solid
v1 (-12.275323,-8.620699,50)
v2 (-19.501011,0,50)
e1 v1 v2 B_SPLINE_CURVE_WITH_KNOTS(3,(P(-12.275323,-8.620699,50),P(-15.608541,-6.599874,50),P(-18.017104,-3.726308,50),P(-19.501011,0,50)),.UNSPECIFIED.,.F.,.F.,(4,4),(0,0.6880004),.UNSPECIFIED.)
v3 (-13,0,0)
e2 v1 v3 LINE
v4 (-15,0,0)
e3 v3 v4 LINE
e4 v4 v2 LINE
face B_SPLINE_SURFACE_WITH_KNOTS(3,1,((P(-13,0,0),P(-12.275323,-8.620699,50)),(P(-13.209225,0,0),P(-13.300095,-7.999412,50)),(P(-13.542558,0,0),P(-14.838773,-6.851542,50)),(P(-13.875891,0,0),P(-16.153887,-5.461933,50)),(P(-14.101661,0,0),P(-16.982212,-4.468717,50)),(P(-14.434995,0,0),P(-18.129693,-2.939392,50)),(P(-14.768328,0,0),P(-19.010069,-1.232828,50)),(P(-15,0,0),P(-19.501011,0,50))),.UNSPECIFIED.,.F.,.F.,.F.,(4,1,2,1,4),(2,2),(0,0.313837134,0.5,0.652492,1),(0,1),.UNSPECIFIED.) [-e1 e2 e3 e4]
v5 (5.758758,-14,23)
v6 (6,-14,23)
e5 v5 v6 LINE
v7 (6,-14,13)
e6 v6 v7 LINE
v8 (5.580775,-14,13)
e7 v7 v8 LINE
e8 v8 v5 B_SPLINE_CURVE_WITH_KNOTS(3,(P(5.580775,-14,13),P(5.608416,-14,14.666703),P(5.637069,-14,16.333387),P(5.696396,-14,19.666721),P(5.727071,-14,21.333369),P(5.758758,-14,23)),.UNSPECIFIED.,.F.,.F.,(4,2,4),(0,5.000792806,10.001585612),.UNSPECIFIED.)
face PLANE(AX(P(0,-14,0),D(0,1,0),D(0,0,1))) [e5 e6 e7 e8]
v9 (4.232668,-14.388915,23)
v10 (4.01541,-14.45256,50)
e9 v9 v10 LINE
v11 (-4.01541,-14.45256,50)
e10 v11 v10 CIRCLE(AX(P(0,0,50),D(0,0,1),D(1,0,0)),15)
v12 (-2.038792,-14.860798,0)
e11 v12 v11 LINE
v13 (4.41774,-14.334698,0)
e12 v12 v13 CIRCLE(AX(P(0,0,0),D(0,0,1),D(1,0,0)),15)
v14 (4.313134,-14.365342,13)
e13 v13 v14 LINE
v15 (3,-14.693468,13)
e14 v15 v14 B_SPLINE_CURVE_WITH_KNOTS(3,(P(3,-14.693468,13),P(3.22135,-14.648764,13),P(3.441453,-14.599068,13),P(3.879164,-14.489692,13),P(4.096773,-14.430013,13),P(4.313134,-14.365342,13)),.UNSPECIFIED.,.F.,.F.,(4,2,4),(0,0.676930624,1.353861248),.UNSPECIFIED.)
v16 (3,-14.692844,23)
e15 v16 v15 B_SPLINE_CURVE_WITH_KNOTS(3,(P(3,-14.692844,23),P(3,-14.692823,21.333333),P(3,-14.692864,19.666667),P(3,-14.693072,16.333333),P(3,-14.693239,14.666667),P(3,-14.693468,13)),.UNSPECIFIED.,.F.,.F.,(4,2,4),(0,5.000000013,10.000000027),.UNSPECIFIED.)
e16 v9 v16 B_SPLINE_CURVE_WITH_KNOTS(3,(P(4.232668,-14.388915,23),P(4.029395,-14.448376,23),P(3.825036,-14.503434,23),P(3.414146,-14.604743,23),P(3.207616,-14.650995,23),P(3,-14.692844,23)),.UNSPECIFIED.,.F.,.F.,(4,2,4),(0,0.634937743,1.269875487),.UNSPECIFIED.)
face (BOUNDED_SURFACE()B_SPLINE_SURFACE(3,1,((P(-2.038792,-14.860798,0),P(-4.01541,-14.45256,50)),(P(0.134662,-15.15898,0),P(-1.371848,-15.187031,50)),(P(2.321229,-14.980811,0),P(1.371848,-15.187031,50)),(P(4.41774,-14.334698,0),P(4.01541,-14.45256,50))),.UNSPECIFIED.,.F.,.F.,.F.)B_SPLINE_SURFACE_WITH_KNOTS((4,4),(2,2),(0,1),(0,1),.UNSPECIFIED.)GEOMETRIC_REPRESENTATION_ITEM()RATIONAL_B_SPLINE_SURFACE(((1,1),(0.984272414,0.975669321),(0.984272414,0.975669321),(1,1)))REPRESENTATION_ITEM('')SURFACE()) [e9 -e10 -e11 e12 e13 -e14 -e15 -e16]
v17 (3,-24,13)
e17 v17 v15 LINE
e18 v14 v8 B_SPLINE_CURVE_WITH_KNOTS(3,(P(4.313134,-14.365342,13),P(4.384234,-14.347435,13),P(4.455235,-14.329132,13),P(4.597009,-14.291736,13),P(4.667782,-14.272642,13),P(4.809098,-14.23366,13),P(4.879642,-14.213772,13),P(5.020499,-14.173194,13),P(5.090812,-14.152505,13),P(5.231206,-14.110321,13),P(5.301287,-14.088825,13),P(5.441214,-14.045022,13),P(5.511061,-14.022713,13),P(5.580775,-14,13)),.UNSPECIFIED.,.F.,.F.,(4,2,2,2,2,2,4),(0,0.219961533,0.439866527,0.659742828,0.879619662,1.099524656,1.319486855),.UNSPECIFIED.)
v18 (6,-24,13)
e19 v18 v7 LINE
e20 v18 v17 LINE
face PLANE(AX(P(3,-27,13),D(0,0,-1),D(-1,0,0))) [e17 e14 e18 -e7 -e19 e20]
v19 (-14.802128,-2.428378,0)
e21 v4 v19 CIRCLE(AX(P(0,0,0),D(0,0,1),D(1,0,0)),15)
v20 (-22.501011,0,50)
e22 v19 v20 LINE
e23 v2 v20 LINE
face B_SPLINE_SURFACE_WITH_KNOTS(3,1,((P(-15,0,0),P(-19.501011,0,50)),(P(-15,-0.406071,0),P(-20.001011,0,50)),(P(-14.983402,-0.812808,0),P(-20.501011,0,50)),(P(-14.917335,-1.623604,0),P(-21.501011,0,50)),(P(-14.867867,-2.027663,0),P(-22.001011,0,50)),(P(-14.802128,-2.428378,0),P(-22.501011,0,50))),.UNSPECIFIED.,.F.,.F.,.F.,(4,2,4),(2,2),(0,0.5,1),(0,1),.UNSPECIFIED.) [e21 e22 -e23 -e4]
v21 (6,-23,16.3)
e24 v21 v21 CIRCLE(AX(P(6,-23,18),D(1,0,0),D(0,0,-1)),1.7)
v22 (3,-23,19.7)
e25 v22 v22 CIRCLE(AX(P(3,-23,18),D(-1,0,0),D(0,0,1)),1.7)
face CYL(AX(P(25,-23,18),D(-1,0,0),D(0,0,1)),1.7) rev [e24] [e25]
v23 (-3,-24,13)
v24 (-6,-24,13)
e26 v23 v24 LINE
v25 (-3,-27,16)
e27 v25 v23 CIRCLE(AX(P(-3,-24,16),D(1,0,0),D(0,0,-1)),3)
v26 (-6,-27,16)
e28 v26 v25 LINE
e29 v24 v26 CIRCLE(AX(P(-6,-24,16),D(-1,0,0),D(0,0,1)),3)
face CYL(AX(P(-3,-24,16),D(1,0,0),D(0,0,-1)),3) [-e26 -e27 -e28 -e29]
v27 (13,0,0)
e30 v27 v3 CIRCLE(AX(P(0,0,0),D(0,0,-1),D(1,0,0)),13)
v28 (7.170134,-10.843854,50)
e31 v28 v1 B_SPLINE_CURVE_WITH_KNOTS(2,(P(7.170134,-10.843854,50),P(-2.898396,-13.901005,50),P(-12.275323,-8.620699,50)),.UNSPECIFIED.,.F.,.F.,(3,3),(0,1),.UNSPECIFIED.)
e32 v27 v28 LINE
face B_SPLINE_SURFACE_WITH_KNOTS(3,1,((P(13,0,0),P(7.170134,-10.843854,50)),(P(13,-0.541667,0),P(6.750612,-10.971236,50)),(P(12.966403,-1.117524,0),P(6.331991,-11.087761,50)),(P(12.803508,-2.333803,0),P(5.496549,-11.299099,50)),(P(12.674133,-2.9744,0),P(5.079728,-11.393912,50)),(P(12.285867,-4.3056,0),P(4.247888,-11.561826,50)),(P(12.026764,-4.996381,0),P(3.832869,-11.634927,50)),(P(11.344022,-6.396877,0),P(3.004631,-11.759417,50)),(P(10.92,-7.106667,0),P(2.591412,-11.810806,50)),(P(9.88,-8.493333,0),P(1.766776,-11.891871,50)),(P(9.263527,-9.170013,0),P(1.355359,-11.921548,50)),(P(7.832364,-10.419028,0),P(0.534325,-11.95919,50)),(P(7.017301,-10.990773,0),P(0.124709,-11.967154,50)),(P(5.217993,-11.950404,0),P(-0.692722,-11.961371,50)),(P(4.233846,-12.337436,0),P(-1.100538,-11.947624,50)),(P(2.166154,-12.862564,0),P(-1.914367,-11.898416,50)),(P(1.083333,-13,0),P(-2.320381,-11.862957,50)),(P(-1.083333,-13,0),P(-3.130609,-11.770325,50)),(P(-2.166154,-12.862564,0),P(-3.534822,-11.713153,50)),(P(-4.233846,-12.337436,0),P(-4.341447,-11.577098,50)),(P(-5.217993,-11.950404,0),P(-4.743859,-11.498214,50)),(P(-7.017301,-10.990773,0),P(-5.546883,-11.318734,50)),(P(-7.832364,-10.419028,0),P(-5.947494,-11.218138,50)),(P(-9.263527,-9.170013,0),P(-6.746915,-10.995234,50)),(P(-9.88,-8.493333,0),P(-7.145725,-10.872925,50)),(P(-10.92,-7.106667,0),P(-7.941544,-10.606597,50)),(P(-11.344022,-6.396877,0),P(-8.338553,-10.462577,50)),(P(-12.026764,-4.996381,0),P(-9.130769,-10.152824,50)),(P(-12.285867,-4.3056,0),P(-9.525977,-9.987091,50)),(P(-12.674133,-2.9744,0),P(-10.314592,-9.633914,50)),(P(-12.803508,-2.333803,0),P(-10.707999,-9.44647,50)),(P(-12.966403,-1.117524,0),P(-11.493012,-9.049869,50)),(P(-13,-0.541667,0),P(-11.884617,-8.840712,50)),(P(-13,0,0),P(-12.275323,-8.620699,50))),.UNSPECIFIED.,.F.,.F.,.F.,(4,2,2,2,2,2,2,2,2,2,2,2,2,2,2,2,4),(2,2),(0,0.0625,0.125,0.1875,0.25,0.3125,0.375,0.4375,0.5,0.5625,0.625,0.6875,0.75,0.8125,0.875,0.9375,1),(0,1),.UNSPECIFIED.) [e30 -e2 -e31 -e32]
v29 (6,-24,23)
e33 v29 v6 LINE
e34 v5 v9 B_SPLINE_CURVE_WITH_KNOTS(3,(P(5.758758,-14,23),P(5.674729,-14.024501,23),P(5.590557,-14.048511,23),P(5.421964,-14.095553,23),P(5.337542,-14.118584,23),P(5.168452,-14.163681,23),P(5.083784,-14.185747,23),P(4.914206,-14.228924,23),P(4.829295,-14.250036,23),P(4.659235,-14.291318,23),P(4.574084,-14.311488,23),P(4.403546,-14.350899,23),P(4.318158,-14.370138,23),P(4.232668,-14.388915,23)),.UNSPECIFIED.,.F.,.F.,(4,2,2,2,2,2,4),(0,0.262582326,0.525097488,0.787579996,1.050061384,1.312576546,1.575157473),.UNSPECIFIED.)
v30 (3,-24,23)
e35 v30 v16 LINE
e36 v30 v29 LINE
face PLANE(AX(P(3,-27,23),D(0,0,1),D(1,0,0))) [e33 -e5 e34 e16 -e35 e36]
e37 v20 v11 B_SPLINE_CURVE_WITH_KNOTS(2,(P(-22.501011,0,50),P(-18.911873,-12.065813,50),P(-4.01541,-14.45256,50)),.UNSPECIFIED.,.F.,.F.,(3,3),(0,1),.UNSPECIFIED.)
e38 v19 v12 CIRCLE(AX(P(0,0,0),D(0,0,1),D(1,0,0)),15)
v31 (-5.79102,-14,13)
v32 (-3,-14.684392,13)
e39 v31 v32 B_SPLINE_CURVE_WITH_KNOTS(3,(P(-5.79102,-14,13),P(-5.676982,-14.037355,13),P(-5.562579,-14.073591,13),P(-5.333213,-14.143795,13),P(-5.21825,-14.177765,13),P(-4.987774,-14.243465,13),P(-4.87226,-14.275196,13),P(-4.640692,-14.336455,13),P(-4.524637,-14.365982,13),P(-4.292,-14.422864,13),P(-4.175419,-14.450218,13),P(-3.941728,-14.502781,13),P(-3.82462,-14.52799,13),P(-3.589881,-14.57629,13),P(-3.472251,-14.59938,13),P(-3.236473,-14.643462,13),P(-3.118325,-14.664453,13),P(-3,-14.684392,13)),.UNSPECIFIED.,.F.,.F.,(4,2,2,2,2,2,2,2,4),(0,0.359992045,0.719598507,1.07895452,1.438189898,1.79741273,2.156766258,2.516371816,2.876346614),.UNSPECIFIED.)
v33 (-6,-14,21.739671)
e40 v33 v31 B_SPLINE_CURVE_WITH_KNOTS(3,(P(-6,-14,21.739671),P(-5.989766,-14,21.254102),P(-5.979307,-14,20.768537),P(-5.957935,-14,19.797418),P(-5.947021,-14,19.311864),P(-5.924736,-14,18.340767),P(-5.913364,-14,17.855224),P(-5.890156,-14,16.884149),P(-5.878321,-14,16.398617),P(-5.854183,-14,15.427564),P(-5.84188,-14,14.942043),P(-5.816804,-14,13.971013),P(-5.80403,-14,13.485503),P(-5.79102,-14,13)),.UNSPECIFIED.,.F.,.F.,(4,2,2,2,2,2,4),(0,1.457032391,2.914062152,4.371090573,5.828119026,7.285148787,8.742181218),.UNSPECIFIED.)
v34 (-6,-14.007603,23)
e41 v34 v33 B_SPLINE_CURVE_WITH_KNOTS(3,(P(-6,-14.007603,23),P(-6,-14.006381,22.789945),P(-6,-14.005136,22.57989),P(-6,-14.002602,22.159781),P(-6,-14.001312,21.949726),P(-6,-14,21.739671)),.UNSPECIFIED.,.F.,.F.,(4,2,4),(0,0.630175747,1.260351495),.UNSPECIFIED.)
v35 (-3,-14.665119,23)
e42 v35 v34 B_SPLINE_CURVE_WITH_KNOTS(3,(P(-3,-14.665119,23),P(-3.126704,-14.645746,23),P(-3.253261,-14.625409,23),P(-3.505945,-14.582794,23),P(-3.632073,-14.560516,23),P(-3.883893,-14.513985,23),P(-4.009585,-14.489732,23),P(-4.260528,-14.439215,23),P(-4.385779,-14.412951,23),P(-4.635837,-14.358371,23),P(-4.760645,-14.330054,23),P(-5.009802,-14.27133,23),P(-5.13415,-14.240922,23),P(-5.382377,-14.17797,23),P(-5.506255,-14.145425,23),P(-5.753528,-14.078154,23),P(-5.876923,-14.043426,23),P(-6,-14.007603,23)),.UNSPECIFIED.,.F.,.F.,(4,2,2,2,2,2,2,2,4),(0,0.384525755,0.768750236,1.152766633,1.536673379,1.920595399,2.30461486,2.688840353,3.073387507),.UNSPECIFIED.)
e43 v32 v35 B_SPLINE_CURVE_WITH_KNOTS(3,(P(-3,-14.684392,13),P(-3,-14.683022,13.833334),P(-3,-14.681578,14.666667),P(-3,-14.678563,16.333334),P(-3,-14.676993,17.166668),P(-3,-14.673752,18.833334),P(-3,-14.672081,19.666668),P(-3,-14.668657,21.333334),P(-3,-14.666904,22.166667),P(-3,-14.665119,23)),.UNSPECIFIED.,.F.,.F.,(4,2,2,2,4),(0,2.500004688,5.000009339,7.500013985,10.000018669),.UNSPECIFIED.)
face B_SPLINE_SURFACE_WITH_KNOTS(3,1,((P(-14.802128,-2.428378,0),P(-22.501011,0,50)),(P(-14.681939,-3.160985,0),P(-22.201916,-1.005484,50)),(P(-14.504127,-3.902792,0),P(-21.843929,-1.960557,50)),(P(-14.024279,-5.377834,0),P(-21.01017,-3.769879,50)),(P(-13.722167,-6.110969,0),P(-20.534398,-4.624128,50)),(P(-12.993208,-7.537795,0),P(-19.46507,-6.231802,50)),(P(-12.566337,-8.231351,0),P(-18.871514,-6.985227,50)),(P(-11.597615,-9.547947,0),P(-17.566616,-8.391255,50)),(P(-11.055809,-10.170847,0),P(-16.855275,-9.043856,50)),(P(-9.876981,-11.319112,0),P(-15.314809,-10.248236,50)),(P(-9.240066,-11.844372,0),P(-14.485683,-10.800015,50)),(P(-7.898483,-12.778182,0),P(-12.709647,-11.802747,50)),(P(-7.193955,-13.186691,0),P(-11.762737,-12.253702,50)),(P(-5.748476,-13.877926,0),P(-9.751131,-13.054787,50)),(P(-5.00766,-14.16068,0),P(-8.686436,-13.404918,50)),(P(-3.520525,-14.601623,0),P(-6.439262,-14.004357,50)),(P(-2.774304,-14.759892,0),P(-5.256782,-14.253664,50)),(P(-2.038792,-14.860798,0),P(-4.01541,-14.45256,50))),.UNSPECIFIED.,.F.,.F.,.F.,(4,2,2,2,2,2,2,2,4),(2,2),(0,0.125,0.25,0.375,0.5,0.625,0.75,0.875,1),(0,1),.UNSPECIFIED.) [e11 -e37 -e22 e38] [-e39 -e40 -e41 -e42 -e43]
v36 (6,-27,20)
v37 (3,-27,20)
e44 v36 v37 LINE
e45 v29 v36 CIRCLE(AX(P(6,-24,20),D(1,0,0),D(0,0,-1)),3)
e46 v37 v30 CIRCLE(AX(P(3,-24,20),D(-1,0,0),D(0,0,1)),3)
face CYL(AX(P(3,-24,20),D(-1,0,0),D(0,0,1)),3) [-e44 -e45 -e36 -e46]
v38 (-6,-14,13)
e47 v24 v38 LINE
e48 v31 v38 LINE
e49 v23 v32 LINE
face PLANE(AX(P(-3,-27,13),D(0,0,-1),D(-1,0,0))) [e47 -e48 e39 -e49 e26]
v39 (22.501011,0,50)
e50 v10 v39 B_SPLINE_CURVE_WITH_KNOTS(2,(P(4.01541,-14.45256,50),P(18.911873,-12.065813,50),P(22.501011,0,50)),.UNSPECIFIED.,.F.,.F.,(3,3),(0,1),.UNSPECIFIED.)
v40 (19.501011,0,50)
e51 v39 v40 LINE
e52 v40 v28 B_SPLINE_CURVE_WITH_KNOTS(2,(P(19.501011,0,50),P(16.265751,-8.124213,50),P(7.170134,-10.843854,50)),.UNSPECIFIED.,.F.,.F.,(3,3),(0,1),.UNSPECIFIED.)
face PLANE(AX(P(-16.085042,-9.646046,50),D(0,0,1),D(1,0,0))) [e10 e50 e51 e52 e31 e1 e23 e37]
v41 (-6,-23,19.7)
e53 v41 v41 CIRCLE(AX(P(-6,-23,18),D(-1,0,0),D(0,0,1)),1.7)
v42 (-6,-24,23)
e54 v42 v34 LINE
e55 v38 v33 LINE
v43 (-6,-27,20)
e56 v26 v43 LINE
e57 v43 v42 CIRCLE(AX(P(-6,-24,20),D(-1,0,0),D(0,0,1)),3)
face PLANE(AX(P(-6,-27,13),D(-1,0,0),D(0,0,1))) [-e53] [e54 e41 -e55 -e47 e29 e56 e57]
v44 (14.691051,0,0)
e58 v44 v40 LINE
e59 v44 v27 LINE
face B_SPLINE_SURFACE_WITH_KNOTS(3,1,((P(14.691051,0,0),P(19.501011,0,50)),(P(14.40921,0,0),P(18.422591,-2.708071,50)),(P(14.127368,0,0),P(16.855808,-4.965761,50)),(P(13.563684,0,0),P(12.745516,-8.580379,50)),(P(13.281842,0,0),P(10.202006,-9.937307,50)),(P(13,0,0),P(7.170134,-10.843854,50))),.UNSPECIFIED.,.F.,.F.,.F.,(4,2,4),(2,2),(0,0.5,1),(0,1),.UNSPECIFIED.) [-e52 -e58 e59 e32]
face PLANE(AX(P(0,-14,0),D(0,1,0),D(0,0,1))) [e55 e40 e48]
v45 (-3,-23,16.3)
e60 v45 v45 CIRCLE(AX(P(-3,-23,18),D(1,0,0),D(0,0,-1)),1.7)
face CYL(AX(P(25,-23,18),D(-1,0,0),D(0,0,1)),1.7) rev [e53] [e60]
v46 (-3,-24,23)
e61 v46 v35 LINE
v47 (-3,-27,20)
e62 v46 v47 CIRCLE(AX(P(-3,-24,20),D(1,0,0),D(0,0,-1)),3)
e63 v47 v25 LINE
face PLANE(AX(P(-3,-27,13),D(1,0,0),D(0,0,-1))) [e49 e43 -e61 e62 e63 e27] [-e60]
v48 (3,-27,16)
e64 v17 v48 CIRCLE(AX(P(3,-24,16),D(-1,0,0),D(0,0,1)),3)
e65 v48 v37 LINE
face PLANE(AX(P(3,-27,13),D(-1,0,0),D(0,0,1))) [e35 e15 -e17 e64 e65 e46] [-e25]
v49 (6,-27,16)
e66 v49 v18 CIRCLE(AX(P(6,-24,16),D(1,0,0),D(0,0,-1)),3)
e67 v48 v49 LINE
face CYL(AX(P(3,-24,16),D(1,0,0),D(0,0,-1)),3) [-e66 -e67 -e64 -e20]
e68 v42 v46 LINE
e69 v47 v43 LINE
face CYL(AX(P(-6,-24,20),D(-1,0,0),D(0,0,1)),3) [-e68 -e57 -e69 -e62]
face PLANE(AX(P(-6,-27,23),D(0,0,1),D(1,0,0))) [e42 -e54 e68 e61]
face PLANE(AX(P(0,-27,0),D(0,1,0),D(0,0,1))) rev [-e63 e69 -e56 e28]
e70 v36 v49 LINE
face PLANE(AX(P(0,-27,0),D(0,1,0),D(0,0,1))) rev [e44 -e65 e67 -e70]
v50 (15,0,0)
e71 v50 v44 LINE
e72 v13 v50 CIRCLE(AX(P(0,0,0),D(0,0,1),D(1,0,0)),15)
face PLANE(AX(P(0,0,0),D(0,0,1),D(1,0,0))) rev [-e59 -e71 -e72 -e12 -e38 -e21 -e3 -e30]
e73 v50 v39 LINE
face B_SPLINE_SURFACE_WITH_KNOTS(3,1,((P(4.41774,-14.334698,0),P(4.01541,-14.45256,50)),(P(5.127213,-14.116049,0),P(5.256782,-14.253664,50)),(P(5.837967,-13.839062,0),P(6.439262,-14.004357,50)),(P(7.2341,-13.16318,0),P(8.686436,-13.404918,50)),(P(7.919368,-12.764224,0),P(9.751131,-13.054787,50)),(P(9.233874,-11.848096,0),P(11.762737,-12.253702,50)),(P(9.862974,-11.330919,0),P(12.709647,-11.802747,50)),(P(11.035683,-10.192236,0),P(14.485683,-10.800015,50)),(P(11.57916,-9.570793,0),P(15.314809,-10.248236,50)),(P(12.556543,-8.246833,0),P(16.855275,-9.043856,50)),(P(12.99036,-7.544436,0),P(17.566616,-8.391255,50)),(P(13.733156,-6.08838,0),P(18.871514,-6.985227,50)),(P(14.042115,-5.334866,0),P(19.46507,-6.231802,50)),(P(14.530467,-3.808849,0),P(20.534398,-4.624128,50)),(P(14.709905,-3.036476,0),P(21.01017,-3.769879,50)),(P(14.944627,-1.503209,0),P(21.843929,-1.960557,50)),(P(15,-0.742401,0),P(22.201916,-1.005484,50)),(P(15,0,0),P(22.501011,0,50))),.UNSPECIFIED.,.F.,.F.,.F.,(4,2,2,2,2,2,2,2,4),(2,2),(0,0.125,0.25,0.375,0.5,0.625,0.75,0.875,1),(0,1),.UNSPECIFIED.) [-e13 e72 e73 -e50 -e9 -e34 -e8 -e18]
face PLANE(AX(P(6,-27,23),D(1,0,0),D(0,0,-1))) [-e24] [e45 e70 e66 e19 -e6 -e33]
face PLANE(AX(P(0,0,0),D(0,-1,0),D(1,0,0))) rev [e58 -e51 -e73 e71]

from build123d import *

# Parameters (mm, degrees)
Y_KSEKLIK_EKSTR_ZYON1_DEPTH      = 1
Y_KSEKLIK_EKSTR_ZYON1_DEPTH_BACK = 12
IZIM3_W                          = 3
IZIM3_H                          = 10
RADYUS1_R                        = 3
IZIM4_R                          = 1.7
KES_EKSTR_ZYON1_DEPTH            = 31


with BuildPart() as part:
    # Loft1: read off the stored shape, not the designer's step
    # Loft1: loft between two sections, ruled curve by curve
    loft1_from = [
        Edge.make_bspline([(-13, 0, 0), (-13.209224756, 0, 0), (-13.54255809, 0, 0), (-13.875891423, 0, 0), (-14.101661333, 0, 0), (-14.434994666, 0, 0), (-14.768328, 0, 0), (-15, 0, 0)], [0, 0, 0, 0, 0.313837134, 0.5, 0.5, 0.652492, 1, 1, 1, 1], 3),
        Edge.make_bspline([(-15, 0, 0), (-15, -0.406070992, 0), (-14.983401695, -0.812808246, 0), (-14.917335296, -1.623604412, 0), (-14.867867201, -2.027663325, 0), (-14.80212762, -2.428377634, 0)], [0, 0, 0, 0, 0.5, 0.5, 1, 1, 1, 1], 3),
        Edge.make_bspline([(13, 0, 0), (13, -0.541666667, 0), (12.966403007, -1.117524212, 0), (12.803508497, -2.333803221, 0), (12.674133333, -2.9744, 0), (12.285866667, -4.3056, 0), (12.026764297, -4.996380928, 0), (11.344022219, -6.396877499, 0), (10.92, -7.106666667, 0), (9.88, -8.493333333, 0), (9.263526615, -9.170013136, 0), (7.832363796, -10.41902796, 0), (7.017301038, -10.99077278, 0), (5.21799308, -11.950403691, 0), (4.233846154, -12.337435897, 0), (2.166153846, -12.862564103, 0), (1.083333333, -13, 0), (-1.083333333, -13, 0), (-2.166153846, -12.862564103, 0), (-4.233846154, -12.337435897, 0), (-5.21799308, -11.950403691, 0), (-7.017301038, -10.99077278, 0), (-7.832363796, -10.41902796, 0), (-9.263526615, -9.170013136, 0), (-9.88, -8.493333333, 0), (-10.92, -7.106666667, 0), (-11.344022219, -6.396877499, 0), (-12.026764297, -4.996380928, 0), (-12.285866667, -4.3056, 0), (-12.674133333, -2.9744, 0), (-12.803508497, -2.333803221, 0), (-12.966403007, -1.117524212, 0), (-13, -0.541666667, 0), (-13, 0, 0)], [0, 0, 0, 0, 0.0625, 0.0625, 0.125, 0.125, 0.1875, 0.1875, 0.25, 0.25, 0.3125, 0.3125, 0.375, 0.375, 0.4375, 0.4375, 0.5, 0.5, 0.5625, 0.5625, 0.625, 0.625, 0.6875, 0.6875, 0.75, 0.75, 0.8125, 0.8125, 0.875, 0.875, 0.9375, 0.9375, 1, 1, 1, 1], 3),
        Edge.make_bspline([(-14.80212762, -2.428377634, 0), (-14.681938937, -3.16098536, 0), (-14.504127476, -3.902792163, 0), (-14.02427913, -5.377833707, 0), (-13.722166884, -6.11096882, 0), (-12.993207628, -7.537795397, 0), (-12.566336555, -8.231351462, 0), (-11.597614897, -9.547946899, 0), (-11.055808561, -10.170847244, 0), (-9.876980677, -11.319111684, 0), (-9.240065749, -11.844371923, 0), (-7.898482942, -12.778181737, 0), (-7.193955206, -13.18669073, 0), (-5.748476154, -13.877925848, 0), (-5.007659558, -14.160679583, 0), (-3.520524561, -14.601623448, 0), (-2.774303774, -14.75989153, 0), (-2.038792236, -14.860798304, 0)], [0, 0, 0, 0, 0.125, 0.125, 0.25, 0.25, 0.375, 0.375, 0.5, 0.5, 0.625, 0.625, 0.75, 0.75, 0.875, 0.875, 1, 1, 1, 1], 3),
        Edge.make_bspline([(-2.038792236, -14.860798304, 0), (0.134662487, -15.158980307, 0), (2.321229161, -14.980811498, 0), (4.417739539, -14.33469837, 0)], [0, 0, 0, 0, 1, 1, 1, 1], 3, [1, 0.984272414, 0.984272414, 1]),
        Edge.make_bspline([(4.417739539, -14.33469837, 0), (5.127212599, -14.116049389, 0), (5.83796731, -13.839062041, 0), (7.234099562, -13.16317986, 0), (7.919368159, -12.764223905, 0), (9.233873859, -11.848095943, 0), (9.86297355, -11.3309185, 0), (11.035682686, -10.192235719, 0), (11.579160408, -9.570793115, 0), (12.556543149, -8.246833378, 0), (12.990359766, -7.544435992, 0), (13.733156479, -6.088380279, 0), (14.042115417, -5.334866309, 0), (14.53046703, -3.808849147, 0), (14.70990537, -3.036475671, 0), (14.944626607, -1.503208594, 0), (15, -0.742401104, 0), (15, 0, 0)], [0, 0, 0, 0, 0.125, 0.125, 0.25, 0.25, 0.375, 0.375, 0.5, 0.5, 0.625, 0.625, 0.75, 0.75, 0.875, 0.875, 1, 1, 1, 1], 3),
        Edge.make_bspline([(14.691051451, 0, 0), (14.409209542, 0, 0), (14.127367634, 0, 0), (13.563683817, 0, 0), (13.281841908, 0, 0), (13, 0, 0)], [0, 0, 0, 0, 0.5, 0.5, 1, 1, 1, 1], 3),
        Edge.make_line((14.691051451, 0, 0), (15, 0, 0)),
    ]
    loft1_to = [
        Edge.make_bspline([(-12.275322713, -8.62069906, 50), (-13.30009489, -7.9994122, 50), (-14.838773196, -6.851542234, 50), (-16.153887151, -5.461933248, 50), (-16.982212381, -4.468717424, 50), (-18.129692881, -2.939391702, 50), (-19.010068808, -1.232828152, 50), (-19.501011098, 0, 50)], [0, 0, 0, 0, 0.313837134, 0.5, 0.5, 0.652492, 1, 1, 1, 1], 3),
        Edge.make_bspline([(-19.501011098, 0, 50), (-20.001011098, 0, 50), (-20.501011098, 0, 50), (-21.501011098, 0, 50), (-22.001011098, 0, 50), (-22.501011098, 0, 50)], [0, 0, 0, 0, 0.5, 0.5, 1, 1, 1, 1], 3),
        Edge.make_bspline([(7.170134264, -10.843854234, 50), (6.75061217, -10.971235531, 50), (6.331990602, -11.087760763, 50), (5.496548516, -11.2990991, 50), (5.079727998, -11.393912204, 50), (4.247888014, -11.561826283, 50), (3.832868547, -11.634927259, 50), (3.004630665, -11.75941708, 50), (2.591412249, -11.810805927, 50), (1.766776468, -11.891871491, 50), (1.355359103, -11.921548209, 50), (0.534325424, -11.959189516, 50), (0.12470911, -11.967154105, 50), (-0.692722467, -11.961371154, 50), (-1.100537731, -11.947623615, 50), (-1.914367207, -11.898416407, 50), (-2.320381419, -11.862956738, 50), (-3.130608793, -11.770325273, 50), (-3.534821955, -11.713153476, 50), (-4.341447227, -11.577097753, 50), (-4.743859338, -11.498213827, 50), (-5.546882508, -11.318733846, 50), (-5.947493568, -11.218137792, 50), (-6.746914637, -10.995233554, 50), (-7.145724646, -10.87292537, 50), (-7.941543614, -10.606596875, 50), (-8.338552572, -10.462576563, 50), (-9.130769437, -10.15282381, 50), (-9.525977345, -9.987091369, 50), (-10.314592108, -9.633914359, 50), (-10.707998965, -9.446469789, 50), (-11.493011627, -9.049868521, 50), (-11.884617433, -8.840711823, 50), (-12.275322713, -8.62069906, 50)], [0, 0, 0, 0, 0.0625, 0.0625, 0.125, 0.125, 0.1875, 0.1875, 0.25, 0.25, 0.3125, 0.3125, 0.375, 0.375, 0.4375, 0.4375, 0.5, 0.5, 0.5625, 0.5625, 0.625, 0.625, 0.6875, 0.6875, 0.75, 0.75, 0.8125, 0.8125, 0.875, 0.875, 0.9375, 0.9375, 1, 1, 1, 1], 3),
        Edge.make_bspline([(-22.501011098, 0, 50), (-22.201916292, -1.005484405, 50), (-21.843929165, -1.960557007, 50), (-21.010170267, -3.769878608, 50), (-20.534398496, -4.624127606, 50), (-19.465070311, -6.231801999, 50), (-18.871513898, -6.985227394, 50), (-17.566616427, -8.391254578, 50), (-16.85527537, -9.043856368, 50), (-15.314808613, -10.248236345, 50), (-14.485682914, -10.800014531, 50), (-12.709646871, -11.802747299, 50), (-11.762736528, -12.253701882, 50), (-9.751131199, -13.054787442, 50), (-8.686436212, -13.40491842, 50), (-6.439261597, -14.004356772, 50), (-5.256781968, -14.253664146, 50), (-4.015410017, -14.452559718, 50)], [0, 0, 0, 0, 0.125, 0.125, 0.25, 0.25, 0.375, 0.375, 0.5, 0.5, 0.625, 0.625, 0.75, 0.75, 0.875, 0.875, 1, 1, 1, 1], 3),
        Edge.make_bspline([(-4.015410017, -14.452559718, 50), (-1.371847999, -15.187030678, 50), (1.371847999, -15.187030678, 50), (4.015410017, -14.452559718, 50)], [0, 0, 0, 0, 1, 1, 1, 1], 3, [1, 0.975669321, 0.975669321, 1]),
        Edge.make_bspline([(4.015410017, -14.452559718, 50), (5.256781968, -14.253664146, 50), (6.439261597, -14.004356772, 50), (8.686436212, -13.40491842, 50), (9.751131199, -13.054787442, 50), (11.762736528, -12.253701882, 50), (12.709646871, -11.802747299, 50), (14.485682914, -10.800014531, 50), (15.314808613, -10.248236345, 50), (16.85527537, -9.043856368, 50), (17.566616427, -8.391254578, 50), (18.871513898, -6.985227394, 50), (19.465070311, -6.231801999, 50), (20.534398496, -4.624127606, 50), (21.010170267, -3.769878608, 50), (21.843929165, -1.960557007, 50), (22.201916292, -1.005484405, 50), (22.501011098, 0, 50)], [0, 0, 0, 0, 0.125, 0.125, 0.25, 0.25, 0.375, 0.375, 0.5, 0.5, 0.625, 0.625, 0.75, 0.75, 0.875, 0.875, 1, 1, 1, 1], 3),
        Edge.make_bspline([(19.501011098, 0, 50), (18.422591042, -2.708071054, 50), (16.855807944, -4.965761101, 50), (12.745515666, -8.580379179, 50), (10.202006485, -9.93730721, 50), (7.170134264, -10.843854234, 50)], [0, 0, 0, 0, 0.5, 0.5, 1, 1, 1, 1], 3),
        Edge.make_line((19.501011098, 0, 50), (22.501011098, 0, 50)),
    ]
    loft1 = Solid(Shell([*[Face.make_surface_from_curves(loft1_from[k], loft1_to[k]) for k in range(8)], Face(Wire(loft1_from)), Face(Wire(loft1_to))]))
    add(loft1)

    # Çizim3 → Yükseklik-Ekstrüzyon1 (add, two sides: drawn at the far end of the back side and taken through both)
    with BuildSketch(Plane(origin=(0, -15, 0), x_dir=(1, 0, 0), z_dir=(0, 1, 0)).offset(-Y_KSEKLIK_EKSTR_ZYON1_DEPTH_BACK)):
        with Locations((-4.5, -18)):
            Rectangle(IZIM3_W, IZIM3_H)
        with Locations((4.5, -18)):
            Rectangle(IZIM3_W, IZIM3_H)
    extrude(amount=Y_KSEKLIK_EKSTR_ZYON1_DEPTH + Y_KSEKLIK_EKSTR_ZYON1_DEPTH_BACK)

    # Radyus1
    radyus1_edges = [part.edges().sort_by_distance(p)[0] for p in [
        (4.5, -27, 23),
        (4.5, -27, 13),
        (-4.5, -27, 13),
        (-4.5, -27, 23),
    ]]
    fillet(radyus1_edges, radius=RADYUS1_R)

    # Çizim4 → Kes-Ekstrüzyon1 (cut)
    with BuildSketch(Plane.ZY.offset(6)):
        with Locations((18, -23)):
            Circle(IZIM4_R)
    extrude(amount=-KES_EKSTR_ZYON1_DEPTH, mode=Mode.SUBTRACT)


solid = part.part
